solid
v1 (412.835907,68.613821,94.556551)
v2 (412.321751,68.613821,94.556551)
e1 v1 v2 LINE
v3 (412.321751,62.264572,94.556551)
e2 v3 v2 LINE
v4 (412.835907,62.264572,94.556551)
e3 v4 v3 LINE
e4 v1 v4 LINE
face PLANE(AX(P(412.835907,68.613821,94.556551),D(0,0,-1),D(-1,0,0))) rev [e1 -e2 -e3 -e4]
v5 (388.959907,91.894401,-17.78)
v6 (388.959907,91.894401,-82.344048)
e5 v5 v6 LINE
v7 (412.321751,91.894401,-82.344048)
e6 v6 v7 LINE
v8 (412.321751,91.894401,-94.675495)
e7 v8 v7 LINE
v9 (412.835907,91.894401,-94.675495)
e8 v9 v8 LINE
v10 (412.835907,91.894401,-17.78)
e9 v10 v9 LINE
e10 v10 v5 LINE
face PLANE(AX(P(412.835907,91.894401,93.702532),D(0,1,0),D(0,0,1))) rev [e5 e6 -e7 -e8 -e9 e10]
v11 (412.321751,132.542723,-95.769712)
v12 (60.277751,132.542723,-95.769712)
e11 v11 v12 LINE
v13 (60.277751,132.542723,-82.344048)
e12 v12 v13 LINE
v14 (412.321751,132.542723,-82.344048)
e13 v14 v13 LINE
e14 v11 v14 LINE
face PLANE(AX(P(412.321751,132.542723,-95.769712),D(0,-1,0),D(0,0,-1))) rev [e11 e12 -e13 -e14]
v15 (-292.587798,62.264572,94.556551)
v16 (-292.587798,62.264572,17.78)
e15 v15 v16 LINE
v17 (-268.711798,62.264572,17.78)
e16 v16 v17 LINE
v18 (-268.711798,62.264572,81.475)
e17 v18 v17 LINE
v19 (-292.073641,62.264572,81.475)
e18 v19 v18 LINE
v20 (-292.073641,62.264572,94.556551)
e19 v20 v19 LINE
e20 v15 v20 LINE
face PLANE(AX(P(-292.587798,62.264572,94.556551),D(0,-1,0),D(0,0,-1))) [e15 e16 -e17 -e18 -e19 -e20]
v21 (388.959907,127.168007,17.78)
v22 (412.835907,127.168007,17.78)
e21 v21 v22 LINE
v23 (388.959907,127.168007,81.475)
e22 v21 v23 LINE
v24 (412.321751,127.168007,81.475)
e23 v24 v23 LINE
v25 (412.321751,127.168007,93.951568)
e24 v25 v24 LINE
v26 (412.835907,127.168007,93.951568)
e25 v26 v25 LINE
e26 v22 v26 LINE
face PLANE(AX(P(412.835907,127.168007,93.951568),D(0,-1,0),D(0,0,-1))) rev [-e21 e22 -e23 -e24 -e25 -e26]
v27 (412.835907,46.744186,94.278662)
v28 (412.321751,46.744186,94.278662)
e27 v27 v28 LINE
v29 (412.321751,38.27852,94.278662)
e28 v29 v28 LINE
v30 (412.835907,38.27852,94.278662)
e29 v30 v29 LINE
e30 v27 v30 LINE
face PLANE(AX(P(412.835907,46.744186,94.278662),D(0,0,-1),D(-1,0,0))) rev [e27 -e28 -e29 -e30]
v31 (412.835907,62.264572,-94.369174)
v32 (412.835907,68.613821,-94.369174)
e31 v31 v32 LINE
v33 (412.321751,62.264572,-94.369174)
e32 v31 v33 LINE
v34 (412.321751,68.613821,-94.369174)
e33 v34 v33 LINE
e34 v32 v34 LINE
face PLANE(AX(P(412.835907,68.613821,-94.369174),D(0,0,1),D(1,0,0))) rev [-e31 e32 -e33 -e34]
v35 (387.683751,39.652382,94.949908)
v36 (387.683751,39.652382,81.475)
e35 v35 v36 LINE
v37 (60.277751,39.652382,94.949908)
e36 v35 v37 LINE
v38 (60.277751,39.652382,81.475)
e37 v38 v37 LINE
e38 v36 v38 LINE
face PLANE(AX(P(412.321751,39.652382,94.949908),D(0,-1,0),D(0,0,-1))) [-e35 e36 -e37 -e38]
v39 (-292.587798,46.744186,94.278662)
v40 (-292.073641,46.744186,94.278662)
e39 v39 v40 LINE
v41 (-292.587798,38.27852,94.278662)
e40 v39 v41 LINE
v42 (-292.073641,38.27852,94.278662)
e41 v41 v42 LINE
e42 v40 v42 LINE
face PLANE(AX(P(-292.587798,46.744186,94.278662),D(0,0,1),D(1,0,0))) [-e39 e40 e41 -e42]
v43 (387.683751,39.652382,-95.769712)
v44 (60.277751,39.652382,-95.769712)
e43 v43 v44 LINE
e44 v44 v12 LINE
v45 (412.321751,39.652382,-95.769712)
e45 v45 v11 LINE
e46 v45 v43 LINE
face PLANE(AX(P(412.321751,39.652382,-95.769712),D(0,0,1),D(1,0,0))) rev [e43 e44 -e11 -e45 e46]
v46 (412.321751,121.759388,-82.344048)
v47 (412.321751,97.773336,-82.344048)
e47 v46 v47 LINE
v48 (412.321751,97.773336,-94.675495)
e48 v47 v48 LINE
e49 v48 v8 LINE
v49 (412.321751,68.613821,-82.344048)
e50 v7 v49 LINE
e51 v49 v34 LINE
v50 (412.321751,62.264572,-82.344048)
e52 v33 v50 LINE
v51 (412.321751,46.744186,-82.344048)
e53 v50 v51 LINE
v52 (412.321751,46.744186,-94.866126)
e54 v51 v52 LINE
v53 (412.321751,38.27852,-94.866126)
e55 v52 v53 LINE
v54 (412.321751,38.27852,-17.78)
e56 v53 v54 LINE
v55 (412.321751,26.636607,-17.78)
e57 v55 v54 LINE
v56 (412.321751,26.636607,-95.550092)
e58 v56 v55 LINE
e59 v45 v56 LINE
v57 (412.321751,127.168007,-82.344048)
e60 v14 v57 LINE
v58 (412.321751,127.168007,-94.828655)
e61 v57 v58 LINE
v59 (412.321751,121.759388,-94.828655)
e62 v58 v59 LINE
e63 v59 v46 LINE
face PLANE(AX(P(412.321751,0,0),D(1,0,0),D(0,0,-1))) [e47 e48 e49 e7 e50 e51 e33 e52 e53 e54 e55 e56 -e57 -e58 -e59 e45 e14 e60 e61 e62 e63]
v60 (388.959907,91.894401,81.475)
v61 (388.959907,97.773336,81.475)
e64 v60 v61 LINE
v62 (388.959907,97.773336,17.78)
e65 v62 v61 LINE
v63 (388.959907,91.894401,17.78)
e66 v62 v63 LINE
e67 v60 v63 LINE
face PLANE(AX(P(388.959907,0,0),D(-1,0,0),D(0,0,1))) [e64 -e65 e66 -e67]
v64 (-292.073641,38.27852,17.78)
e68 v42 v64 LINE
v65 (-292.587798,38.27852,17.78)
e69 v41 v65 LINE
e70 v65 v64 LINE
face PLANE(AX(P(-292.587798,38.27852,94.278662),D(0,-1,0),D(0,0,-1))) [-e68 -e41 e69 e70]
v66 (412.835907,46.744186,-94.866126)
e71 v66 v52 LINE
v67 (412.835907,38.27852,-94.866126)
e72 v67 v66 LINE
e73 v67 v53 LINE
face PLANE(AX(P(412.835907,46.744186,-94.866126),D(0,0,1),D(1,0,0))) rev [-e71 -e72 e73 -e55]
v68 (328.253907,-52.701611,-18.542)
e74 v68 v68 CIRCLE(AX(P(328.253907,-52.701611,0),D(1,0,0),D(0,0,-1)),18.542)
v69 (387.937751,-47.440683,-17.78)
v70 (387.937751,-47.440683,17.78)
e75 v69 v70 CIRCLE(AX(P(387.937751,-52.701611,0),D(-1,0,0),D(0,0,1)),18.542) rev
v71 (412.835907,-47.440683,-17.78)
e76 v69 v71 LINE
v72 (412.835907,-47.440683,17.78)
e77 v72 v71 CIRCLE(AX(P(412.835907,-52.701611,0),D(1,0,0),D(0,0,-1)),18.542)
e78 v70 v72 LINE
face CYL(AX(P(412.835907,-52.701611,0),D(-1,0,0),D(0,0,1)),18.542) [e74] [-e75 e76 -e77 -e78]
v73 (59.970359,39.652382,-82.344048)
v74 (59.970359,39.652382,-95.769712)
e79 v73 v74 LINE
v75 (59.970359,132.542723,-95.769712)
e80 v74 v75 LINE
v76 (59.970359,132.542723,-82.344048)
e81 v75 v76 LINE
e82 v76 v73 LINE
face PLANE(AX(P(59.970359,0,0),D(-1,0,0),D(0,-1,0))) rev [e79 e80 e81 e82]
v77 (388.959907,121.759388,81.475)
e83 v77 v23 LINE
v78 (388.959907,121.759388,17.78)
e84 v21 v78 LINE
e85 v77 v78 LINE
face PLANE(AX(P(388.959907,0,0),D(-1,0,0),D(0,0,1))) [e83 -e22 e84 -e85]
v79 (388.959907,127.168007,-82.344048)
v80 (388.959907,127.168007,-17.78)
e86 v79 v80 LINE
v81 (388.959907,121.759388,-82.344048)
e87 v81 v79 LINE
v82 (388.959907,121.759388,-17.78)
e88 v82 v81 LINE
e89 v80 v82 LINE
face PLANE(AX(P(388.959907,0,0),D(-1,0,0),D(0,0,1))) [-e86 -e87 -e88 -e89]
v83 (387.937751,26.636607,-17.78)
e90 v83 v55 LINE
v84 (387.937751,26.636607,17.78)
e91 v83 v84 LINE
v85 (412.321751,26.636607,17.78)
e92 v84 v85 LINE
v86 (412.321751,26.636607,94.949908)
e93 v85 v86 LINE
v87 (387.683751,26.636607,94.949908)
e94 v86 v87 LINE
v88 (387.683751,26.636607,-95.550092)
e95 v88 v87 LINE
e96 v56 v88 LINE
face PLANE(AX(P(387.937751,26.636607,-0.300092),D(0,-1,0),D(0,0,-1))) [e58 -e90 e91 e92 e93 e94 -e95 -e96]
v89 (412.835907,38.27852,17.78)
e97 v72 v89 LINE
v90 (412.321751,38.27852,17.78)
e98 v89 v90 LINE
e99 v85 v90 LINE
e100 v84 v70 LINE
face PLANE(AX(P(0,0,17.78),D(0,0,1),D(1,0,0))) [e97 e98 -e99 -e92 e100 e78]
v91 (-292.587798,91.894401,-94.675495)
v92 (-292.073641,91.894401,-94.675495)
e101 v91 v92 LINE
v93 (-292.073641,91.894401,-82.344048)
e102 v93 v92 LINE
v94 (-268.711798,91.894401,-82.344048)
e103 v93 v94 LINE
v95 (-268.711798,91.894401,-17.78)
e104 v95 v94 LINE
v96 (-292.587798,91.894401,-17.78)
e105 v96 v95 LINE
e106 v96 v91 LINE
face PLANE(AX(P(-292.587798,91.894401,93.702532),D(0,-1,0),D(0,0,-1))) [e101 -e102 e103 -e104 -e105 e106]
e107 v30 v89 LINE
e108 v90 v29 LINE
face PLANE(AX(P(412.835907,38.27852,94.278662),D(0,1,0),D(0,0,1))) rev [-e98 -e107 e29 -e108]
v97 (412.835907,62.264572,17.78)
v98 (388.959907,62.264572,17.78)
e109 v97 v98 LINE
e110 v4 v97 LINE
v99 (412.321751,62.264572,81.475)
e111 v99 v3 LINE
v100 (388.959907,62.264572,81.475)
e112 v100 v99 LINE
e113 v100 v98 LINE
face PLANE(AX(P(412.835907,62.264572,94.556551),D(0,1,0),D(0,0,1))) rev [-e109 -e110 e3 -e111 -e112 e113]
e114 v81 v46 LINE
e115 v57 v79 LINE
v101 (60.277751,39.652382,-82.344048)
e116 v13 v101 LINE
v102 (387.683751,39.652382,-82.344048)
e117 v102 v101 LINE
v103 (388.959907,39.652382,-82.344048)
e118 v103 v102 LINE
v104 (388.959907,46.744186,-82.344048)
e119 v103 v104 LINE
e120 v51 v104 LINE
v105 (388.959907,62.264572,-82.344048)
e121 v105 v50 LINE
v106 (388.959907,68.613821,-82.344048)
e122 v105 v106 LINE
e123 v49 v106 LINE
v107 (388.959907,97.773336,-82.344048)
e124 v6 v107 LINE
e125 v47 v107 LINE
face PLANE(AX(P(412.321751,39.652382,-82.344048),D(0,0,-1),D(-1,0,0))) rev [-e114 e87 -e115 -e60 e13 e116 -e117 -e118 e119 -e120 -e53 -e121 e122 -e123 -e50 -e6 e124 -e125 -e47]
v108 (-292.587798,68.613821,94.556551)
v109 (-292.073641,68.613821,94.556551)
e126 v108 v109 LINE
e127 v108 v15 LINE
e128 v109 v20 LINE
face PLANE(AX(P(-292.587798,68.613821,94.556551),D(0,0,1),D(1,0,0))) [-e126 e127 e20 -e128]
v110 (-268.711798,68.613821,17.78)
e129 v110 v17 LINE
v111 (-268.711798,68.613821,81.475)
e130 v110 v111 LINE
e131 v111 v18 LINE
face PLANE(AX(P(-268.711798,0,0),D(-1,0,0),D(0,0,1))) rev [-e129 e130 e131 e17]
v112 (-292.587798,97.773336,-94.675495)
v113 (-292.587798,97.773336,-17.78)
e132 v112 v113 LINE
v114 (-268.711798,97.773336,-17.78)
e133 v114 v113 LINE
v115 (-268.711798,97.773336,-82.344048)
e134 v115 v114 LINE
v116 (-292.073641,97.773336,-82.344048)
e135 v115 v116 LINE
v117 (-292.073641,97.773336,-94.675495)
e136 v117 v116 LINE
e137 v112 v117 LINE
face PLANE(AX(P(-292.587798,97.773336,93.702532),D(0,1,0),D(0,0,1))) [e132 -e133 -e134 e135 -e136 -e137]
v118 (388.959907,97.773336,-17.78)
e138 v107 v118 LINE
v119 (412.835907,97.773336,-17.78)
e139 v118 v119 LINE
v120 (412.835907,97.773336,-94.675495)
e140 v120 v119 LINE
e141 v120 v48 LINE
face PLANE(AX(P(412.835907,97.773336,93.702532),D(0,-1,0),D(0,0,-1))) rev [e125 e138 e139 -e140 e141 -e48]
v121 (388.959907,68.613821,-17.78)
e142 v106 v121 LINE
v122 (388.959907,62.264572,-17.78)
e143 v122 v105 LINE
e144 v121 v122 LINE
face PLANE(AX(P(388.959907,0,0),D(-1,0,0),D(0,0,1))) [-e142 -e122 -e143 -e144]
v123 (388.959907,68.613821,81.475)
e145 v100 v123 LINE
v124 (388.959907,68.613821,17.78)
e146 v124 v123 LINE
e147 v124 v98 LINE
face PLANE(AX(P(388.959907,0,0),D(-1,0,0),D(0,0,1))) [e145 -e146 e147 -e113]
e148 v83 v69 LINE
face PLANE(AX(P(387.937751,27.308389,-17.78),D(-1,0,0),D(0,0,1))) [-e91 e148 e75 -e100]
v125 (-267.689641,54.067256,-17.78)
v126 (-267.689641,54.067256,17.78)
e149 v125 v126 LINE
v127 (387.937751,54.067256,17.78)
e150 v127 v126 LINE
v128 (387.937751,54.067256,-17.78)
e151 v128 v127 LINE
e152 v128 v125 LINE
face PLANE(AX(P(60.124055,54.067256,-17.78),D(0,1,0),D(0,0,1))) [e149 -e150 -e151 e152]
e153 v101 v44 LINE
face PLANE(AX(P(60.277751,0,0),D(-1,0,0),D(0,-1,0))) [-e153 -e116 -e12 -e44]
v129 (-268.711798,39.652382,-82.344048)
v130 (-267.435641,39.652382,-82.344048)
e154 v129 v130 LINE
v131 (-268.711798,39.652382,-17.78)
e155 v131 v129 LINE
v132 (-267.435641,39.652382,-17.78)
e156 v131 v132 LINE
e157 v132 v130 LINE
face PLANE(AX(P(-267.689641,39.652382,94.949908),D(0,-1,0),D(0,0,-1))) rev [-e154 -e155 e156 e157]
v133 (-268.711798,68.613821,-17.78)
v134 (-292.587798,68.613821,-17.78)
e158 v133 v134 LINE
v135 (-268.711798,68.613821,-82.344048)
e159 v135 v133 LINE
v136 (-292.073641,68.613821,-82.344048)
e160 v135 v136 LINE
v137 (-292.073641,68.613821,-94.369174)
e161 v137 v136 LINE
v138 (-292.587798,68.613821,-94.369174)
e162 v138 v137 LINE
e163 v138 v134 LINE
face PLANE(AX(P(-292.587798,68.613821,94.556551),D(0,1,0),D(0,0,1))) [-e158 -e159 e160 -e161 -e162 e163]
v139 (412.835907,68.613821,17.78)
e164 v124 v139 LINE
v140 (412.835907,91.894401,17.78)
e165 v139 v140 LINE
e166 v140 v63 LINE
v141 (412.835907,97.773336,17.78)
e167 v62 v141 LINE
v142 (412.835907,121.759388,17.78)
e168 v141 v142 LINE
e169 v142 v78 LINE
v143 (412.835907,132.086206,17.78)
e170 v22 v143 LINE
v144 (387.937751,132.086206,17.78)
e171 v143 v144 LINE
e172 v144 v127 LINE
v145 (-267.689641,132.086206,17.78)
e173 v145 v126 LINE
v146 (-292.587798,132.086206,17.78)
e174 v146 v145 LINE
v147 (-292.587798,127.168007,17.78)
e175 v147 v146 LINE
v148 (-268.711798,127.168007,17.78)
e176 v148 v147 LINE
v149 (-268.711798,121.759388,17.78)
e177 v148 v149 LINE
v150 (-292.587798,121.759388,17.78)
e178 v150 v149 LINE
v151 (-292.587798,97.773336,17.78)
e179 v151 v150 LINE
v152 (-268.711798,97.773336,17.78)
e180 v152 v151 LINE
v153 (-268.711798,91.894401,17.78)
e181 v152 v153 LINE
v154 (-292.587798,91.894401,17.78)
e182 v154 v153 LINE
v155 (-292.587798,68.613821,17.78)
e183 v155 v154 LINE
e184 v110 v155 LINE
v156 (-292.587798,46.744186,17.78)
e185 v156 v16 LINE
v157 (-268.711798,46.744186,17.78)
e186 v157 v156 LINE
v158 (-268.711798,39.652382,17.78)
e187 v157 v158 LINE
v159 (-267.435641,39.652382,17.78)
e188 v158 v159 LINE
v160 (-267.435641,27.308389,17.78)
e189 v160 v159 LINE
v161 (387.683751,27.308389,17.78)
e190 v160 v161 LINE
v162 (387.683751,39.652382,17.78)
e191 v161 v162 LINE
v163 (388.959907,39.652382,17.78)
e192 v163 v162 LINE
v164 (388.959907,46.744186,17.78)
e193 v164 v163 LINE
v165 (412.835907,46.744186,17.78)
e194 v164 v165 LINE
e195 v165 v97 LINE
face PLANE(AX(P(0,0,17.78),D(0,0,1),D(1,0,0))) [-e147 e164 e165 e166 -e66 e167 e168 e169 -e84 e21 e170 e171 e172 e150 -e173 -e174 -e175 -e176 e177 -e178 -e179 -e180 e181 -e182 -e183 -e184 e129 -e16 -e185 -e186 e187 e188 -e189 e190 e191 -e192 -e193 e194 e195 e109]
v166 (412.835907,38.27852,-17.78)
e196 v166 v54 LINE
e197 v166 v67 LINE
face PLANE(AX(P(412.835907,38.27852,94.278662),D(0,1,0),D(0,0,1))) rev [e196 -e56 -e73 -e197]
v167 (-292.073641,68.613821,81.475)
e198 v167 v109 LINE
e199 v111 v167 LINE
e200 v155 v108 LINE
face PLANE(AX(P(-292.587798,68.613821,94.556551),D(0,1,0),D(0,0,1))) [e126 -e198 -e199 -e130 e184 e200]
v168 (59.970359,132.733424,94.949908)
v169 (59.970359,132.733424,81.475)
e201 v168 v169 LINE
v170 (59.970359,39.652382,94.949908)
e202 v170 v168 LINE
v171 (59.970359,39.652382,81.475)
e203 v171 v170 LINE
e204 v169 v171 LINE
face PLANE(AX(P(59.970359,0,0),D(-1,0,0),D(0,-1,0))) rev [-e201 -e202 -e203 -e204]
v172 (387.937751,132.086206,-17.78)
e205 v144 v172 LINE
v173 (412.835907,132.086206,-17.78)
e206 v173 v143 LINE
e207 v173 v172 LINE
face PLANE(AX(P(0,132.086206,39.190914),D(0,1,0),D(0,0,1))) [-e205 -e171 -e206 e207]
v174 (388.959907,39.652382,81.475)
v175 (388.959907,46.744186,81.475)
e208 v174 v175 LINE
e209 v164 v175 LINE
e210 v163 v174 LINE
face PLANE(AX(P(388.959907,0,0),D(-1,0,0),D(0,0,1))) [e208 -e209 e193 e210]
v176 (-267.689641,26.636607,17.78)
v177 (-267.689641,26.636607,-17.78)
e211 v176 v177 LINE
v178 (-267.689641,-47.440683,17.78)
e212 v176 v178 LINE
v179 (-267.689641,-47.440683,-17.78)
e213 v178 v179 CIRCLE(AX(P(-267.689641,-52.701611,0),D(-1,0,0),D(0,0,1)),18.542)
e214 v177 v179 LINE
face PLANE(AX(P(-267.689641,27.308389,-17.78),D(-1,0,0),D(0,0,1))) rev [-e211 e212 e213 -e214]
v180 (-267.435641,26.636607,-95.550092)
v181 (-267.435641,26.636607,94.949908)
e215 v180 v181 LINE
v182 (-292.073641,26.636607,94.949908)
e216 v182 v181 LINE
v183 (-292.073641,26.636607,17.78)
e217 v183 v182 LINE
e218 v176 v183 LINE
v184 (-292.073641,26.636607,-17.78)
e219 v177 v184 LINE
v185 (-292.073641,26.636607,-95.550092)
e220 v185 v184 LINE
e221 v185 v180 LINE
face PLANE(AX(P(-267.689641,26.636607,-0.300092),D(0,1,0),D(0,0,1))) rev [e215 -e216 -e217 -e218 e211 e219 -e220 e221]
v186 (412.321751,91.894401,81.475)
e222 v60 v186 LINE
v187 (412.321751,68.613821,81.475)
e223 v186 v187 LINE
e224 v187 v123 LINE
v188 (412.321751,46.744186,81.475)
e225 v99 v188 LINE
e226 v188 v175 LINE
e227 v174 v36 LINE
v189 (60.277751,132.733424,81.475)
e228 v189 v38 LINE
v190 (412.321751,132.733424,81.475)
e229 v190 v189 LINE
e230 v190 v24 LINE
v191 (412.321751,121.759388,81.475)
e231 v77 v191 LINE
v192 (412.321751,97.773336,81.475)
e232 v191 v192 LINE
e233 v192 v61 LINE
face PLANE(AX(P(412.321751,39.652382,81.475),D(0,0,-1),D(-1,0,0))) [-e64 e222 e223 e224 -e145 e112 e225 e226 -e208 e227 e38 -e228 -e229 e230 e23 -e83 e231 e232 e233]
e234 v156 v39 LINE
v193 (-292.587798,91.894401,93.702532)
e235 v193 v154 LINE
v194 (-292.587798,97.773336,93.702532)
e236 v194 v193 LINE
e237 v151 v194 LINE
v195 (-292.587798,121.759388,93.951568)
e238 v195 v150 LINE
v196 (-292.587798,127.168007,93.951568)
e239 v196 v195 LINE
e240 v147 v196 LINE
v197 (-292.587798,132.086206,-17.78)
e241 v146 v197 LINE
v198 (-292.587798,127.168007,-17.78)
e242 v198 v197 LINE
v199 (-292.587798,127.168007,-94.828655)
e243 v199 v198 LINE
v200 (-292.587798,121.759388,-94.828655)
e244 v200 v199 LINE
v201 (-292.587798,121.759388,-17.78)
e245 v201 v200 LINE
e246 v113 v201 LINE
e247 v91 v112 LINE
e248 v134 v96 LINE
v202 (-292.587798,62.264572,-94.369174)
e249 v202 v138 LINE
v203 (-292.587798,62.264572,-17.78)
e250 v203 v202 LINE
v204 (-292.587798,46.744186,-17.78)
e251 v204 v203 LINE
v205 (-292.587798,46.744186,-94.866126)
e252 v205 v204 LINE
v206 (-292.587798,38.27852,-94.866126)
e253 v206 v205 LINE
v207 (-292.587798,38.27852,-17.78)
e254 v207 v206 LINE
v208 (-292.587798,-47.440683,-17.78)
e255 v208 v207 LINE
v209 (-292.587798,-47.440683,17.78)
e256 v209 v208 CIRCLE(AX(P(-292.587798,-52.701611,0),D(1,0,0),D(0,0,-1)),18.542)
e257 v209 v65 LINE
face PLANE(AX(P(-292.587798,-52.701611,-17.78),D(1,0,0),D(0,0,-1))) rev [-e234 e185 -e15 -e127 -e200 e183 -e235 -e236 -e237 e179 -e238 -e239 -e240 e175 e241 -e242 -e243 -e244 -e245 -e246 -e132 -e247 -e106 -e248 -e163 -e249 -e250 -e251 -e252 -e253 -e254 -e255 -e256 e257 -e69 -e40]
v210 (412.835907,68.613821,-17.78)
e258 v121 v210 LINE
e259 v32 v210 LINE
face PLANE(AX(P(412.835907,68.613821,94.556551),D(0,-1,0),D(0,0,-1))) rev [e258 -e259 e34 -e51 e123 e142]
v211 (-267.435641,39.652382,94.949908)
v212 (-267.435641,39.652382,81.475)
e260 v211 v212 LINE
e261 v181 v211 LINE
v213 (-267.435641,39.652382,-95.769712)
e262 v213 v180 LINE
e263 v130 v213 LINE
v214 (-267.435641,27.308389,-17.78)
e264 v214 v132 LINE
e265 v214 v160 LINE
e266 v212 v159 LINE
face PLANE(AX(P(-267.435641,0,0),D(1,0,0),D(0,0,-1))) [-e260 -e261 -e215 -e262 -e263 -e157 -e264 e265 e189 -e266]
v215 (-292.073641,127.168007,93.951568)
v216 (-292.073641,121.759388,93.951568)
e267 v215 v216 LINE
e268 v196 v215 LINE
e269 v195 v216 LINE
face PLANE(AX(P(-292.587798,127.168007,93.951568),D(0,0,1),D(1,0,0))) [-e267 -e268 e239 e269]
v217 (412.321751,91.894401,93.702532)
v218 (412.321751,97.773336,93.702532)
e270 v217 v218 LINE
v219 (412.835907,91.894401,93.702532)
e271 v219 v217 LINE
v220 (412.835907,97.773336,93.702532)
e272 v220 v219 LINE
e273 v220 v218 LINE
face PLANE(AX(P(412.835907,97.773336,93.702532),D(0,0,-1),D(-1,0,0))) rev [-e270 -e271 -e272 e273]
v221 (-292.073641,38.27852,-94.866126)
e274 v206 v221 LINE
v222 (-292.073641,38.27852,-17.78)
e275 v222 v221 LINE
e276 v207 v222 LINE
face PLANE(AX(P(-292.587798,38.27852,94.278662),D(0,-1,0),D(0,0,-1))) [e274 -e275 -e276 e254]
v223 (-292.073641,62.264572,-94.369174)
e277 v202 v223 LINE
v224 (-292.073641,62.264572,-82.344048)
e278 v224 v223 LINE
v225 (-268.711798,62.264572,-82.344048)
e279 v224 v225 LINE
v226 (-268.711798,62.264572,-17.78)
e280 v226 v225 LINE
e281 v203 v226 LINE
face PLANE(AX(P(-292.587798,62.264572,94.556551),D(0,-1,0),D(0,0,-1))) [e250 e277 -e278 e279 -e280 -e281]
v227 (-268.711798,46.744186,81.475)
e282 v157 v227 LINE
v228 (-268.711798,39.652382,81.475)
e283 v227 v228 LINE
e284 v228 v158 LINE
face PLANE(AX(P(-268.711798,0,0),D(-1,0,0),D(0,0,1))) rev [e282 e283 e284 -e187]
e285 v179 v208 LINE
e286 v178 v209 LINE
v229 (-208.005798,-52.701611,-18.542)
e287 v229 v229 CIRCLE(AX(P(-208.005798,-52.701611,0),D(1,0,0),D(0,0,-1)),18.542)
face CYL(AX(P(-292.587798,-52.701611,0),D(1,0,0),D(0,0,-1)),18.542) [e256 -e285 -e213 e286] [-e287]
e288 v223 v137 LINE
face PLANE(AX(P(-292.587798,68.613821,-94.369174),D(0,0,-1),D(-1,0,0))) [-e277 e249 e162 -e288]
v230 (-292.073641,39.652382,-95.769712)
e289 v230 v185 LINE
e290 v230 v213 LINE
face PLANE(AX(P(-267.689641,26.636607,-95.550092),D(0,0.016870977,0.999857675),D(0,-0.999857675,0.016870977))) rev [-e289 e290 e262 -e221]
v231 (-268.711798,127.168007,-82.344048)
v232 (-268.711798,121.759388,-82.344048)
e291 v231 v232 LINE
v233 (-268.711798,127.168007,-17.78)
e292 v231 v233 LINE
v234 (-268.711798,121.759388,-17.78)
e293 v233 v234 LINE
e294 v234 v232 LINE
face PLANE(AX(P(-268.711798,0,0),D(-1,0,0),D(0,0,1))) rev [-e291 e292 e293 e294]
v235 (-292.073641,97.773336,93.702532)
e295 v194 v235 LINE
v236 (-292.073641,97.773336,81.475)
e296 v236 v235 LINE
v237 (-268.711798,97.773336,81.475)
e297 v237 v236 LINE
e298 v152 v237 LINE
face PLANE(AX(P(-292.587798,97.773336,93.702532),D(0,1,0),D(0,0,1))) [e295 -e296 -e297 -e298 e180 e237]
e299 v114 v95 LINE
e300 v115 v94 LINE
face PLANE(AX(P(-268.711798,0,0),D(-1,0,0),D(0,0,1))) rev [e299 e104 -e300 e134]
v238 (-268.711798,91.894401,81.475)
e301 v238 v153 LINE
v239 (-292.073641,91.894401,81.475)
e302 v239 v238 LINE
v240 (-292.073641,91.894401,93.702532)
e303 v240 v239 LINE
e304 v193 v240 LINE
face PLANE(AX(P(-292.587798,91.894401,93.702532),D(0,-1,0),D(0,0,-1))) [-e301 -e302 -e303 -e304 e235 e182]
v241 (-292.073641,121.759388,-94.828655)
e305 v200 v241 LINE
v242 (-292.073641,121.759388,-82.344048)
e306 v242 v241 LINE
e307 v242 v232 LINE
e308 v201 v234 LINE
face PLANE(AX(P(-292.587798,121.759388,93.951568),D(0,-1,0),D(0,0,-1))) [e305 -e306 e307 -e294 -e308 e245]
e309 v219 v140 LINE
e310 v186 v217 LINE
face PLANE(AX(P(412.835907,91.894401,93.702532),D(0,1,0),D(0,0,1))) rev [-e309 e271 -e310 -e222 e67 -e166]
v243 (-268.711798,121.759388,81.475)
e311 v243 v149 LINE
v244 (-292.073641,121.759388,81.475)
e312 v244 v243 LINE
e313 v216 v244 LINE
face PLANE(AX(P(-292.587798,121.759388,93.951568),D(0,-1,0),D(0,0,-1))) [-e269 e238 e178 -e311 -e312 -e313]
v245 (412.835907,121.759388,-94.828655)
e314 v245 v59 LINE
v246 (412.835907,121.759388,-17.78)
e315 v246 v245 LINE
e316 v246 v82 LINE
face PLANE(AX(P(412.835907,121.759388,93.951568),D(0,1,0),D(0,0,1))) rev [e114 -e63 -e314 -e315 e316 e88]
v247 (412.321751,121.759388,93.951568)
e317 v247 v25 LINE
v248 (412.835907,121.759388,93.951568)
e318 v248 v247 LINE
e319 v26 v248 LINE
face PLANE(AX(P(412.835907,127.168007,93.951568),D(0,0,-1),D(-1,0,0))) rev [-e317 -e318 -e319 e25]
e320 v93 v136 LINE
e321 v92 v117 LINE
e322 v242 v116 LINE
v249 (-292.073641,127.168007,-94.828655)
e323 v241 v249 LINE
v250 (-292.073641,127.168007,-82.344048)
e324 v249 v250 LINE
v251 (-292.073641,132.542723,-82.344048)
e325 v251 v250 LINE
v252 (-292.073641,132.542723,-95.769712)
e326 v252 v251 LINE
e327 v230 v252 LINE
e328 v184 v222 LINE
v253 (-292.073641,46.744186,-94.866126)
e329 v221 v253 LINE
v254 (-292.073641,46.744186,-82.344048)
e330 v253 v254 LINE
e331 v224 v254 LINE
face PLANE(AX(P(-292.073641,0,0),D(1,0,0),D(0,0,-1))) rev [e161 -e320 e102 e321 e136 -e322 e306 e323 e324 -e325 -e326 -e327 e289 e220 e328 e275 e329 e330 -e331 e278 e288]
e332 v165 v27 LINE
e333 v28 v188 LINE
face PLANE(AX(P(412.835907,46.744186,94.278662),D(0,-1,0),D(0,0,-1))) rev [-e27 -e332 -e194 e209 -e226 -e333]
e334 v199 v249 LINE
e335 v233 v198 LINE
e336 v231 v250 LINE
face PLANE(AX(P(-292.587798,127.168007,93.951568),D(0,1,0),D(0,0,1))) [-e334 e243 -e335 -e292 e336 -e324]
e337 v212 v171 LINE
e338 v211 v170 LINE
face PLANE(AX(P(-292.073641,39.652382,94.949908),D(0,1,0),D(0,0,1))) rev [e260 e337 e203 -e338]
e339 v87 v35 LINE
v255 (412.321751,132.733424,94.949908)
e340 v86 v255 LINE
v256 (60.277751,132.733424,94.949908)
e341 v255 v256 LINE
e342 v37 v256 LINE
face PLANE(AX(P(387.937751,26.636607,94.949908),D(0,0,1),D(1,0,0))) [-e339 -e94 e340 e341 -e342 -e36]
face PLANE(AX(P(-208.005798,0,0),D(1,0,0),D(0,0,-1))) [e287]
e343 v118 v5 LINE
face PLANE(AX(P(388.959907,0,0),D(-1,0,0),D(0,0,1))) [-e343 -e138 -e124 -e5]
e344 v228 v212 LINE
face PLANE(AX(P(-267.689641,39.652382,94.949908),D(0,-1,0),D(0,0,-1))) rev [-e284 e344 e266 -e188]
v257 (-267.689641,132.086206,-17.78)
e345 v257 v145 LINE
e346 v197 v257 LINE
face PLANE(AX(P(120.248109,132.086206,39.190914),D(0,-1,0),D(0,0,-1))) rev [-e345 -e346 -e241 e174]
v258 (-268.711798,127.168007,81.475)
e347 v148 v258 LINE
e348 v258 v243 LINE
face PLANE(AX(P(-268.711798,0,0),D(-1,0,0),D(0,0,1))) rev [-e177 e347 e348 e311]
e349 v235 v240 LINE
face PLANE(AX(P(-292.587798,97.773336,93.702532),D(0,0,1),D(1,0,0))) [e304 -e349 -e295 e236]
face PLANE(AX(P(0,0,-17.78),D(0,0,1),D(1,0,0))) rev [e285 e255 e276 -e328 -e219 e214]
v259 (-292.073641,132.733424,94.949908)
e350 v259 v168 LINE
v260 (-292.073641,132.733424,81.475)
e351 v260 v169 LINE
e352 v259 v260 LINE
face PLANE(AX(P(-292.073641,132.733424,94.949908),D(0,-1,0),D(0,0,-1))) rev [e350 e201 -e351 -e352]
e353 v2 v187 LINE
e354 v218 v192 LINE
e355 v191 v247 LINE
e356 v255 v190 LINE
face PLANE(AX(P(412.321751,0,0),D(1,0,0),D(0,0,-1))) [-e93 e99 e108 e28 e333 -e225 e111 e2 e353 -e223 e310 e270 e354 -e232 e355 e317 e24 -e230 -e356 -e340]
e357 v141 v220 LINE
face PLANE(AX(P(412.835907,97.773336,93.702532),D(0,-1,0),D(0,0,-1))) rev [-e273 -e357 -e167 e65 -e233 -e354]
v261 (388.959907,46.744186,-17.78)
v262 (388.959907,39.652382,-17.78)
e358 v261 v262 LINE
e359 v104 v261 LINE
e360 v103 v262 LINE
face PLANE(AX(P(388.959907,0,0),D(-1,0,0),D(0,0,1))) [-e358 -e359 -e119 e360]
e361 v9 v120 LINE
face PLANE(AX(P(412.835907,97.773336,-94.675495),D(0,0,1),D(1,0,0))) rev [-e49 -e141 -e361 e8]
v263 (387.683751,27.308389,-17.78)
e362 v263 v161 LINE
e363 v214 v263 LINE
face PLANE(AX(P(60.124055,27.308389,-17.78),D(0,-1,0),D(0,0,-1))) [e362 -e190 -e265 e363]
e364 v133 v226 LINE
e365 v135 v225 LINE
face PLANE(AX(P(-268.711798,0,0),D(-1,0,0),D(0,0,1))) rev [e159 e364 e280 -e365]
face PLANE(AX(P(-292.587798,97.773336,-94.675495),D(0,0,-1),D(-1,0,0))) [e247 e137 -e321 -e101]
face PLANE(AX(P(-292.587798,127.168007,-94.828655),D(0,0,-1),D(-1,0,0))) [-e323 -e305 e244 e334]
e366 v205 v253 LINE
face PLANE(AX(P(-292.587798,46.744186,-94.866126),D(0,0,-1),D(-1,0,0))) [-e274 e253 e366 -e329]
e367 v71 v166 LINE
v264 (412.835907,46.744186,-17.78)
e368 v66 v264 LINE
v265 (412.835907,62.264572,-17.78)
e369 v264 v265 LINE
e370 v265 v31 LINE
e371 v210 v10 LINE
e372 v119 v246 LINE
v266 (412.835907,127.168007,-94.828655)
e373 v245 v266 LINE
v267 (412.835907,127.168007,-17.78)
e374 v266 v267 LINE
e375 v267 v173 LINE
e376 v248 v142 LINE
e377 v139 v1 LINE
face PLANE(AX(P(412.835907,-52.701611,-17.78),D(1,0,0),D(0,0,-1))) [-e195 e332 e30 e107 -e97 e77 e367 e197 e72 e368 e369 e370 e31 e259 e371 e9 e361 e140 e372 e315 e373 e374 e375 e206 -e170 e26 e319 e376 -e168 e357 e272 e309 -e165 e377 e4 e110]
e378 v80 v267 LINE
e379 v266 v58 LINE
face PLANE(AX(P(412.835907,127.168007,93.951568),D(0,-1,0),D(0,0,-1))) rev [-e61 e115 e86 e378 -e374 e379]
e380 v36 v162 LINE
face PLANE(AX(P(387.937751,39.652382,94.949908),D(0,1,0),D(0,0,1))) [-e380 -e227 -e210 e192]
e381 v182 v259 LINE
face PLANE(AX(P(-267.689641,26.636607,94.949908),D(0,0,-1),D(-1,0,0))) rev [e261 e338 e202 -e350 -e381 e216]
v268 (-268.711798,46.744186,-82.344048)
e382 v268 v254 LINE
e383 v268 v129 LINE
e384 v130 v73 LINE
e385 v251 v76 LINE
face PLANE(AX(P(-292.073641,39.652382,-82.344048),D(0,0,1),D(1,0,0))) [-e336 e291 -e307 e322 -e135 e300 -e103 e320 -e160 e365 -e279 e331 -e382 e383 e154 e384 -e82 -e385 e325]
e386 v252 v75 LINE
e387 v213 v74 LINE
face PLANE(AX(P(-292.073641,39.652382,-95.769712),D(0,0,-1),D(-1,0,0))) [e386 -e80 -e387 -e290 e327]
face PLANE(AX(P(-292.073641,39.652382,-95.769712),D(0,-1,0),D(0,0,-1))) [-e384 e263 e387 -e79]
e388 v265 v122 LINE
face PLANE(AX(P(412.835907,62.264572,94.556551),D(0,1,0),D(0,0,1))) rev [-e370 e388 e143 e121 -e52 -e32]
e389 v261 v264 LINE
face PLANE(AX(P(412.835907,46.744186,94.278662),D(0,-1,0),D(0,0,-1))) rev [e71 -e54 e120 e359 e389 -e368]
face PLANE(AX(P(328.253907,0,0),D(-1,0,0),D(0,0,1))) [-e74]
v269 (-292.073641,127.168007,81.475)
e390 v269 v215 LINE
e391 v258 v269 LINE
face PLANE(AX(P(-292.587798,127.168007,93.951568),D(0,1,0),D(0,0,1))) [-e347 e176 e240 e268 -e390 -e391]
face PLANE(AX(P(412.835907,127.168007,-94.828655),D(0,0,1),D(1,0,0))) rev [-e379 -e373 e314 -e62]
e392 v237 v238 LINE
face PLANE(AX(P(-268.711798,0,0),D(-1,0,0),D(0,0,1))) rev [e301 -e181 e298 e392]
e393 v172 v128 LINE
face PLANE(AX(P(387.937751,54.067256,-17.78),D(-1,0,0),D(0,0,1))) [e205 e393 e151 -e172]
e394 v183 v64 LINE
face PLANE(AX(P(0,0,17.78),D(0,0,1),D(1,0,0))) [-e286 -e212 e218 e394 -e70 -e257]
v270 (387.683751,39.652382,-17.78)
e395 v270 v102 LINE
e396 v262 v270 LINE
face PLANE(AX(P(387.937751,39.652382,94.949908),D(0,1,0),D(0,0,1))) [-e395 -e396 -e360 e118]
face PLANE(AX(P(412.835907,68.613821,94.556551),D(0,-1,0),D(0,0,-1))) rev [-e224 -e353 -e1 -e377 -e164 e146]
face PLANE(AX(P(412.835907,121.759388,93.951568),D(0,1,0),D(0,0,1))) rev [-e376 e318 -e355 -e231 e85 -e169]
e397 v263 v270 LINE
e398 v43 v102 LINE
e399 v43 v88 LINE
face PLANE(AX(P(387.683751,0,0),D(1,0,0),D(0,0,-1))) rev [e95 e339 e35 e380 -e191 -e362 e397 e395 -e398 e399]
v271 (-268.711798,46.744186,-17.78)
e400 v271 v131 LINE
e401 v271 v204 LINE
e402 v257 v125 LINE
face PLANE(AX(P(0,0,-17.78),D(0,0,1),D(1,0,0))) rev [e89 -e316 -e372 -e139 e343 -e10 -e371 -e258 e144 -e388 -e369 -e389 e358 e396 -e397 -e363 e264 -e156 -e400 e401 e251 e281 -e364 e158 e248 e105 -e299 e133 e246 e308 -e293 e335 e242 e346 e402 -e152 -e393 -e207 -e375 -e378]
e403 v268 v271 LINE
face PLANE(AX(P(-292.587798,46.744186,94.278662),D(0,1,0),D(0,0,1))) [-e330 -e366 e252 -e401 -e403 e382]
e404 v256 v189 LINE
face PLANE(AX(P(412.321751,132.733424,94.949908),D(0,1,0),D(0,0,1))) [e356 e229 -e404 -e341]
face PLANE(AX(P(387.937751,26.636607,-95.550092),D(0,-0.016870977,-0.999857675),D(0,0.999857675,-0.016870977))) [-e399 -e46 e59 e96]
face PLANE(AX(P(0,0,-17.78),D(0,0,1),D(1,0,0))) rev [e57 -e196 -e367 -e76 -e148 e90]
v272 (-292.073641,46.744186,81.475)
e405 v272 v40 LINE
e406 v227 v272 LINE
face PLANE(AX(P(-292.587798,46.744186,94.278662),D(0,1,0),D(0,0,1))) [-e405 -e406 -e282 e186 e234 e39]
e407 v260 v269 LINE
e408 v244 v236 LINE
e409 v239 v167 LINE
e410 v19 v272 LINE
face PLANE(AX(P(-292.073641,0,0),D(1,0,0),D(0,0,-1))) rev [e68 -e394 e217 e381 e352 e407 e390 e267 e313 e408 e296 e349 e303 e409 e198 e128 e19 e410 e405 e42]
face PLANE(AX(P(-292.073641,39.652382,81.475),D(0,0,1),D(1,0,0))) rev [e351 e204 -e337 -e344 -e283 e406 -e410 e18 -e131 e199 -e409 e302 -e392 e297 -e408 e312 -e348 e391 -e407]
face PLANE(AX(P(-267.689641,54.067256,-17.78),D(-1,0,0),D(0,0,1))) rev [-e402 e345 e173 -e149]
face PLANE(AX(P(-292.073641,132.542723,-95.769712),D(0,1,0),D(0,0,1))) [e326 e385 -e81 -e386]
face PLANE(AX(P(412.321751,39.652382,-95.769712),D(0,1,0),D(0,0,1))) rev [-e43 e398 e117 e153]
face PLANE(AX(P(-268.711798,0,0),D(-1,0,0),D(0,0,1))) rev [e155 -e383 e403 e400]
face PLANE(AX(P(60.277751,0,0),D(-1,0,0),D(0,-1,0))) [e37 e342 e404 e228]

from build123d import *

# Parameters (mm, degrees)
BOSS_EXTRUDE1_DEPTH     = 17.78
BOSS_EXTRUDE2_START     = -0.254
BOSS_EXTRUDE2_DEPTH     = 24.638
BOSS_EXTRUDE3_START     = 328.253907246
BOSS_EXTRUDE3_OUTLINE_R = 18.542
BOSS_EXTRUDE3_DEPTH     = 84.582
CUT_EXTRUDE1_DEPTH      = 528.32
BOSS_EXTRUDE4_DEPTH     = 352.044
BOSS_EXTRUDE5_DEPTH     = 23.876


# Read off the part's stored shape, not the designer's step: Boss-Extrude3
with BuildPart() as part:
    # Sketch2 → Boss-Extrude1 (new, symmetric)
    with BuildSketch(Plane.XY):
        Polygon((60.124054664, 27.308389094), (387.937750572, 27.308389094), (387.937750572, -52.701610906), (412.835907246, -52.701610906), (412.835907246, 175.898389094), (387.937750572, 175.898389094), (387.937750572, 54.067255535), (60.124054664, 54.067255535), align=None)
    boss_extrude1 = extrude(amount=BOSS_EXTRUDE1_DEPTH, both=True)

    # 3DSketch1 → Boss-Extrude2 (add)
    with BuildSketch(Plane(origin=(387.937750572, 26.636606535, -0.300092304), x_dir=(1.1522480113550012e-15, 0.13508458090011558, -0.9908340708731408), z_dir=(1, 0, 0)).offset(BOSS_EXTRUDE2_START)):
        Polygon((0, 0), (94.376945251, -12.866806331), (96.35278288, 0), (-92.6187147, 25.763279951), (-94.376945251, 12.866806331), align=None)
    boss_extrude2 = extrude(amount=BOSS_EXTRUDE2_DEPTH)

    # Boss-Extrude3 outline → Boss-Extrude3 (add)
    with BuildSketch(Plane.YZ.offset(BOSS_EXTRUDE3_START)):
        with Locations((-52.701610906, 0)):
            Circle(BOSS_EXTRUDE3_OUTLINE_R)
    boss_extrude3 = extrude(amount=BOSS_EXTRUDE3_DEPTH)

    # 3DSketch4 → Cut-Extrude1 (cut)
    with BuildSketch(Plane(origin=(0, 190.54505023, 39.190913927), x_dir=(0, -0.6094247818041636, -0.7928438908908536), z_dir=(1, 0, 0))):
        Polygon((0, 0), (35.626268271, -46.348737362), (95.924625616, 0), (60.298357345, 46.348737362), align=None)
    cut_extrude1 = extrude(amount=CUT_EXTRUDE1_DEPTH, mode=Mode.SUBTRACT)

    # 3DSketch5 → Boss-Extrude4 (add)
    with BuildSketch(Plane(origin=(412.321750572, 39.652381829, 94.949907696), x_dir=(-2.6167454914043564e-15, 0.43787667160404403, -0.8990350496309719), z_dir=(1, 0, 0))):
        Polygon((0, 0), (12.114414059, -5.90034761), (52.872430981, 77.782771729), (40.758016921, 83.683119339), align=None)
        Polygon((171.463623123, -83.51167246), (159.39348064, -77.632887402), (200.067994044, 5.878785058), (212.138136527, 0), align=None)
    boss_extrude4 = extrude(amount=-BOSS_EXTRUDE4_DEPTH)

    # 3DSketch7 → Boss-Extrude5 (add)
    with BuildSketch(Plane(origin=(412.835907246, 127.168007467, 93.951567648), x_dir=(0, -0.42593081119403703, -0.9047557372438098), z_dir=(-1, 0, 0))):
        Polygon((0, 0), (170.799989129, -80.407313186), (173.103686862, -75.513833574), (2.303697733, 4.893479612), align=None)
        Polygon((12.745412392, 26.488926133), (183.181513062, -53.747079705), (185.685532337, -48.428080127), (15.249431667, 31.807925711), align=None)
        Polygon((24.392670249, 53.234916651), (195.324303783, -27.234370619), (198.0286446, -21.489851074), (27.097011066, 58.979436196), align=None)
        Polygon((33.959043019, 72.903233879), (205.08887574, -7.659359393), (208.694663496, 0), (37.564830775, 80.562593273), align=None)
    boss_extrude5 = extrude(amount=BOSS_EXTRUDE5_DEPTH)

    # Mirror5: Boss-Extrude1, Boss-Extrude2, Boss-Extrude3, Cut-Extrude1, Boss-Extrude4, Boss-Extrude5 across plane
    add(boss_extrude1.mirror(Plane.ZY.offset(-60.124054664)))
    add(boss_extrude2.mirror(Plane.ZY.offset(-60.124054664)))
    add(boss_extrude3.mirror(Plane.ZY.offset(-60.124054664)))
    add(cut_extrude1.mirror(Plane.ZY.offset(-60.124054664)), mode=Mode.SUBTRACT)
    add(boss_extrude4.mirror(Plane.ZY.offset(-60.124054664)))
    add(boss_extrude5.mirror(Plane.ZY.offset(-60.124054664)))


solid = part.part
